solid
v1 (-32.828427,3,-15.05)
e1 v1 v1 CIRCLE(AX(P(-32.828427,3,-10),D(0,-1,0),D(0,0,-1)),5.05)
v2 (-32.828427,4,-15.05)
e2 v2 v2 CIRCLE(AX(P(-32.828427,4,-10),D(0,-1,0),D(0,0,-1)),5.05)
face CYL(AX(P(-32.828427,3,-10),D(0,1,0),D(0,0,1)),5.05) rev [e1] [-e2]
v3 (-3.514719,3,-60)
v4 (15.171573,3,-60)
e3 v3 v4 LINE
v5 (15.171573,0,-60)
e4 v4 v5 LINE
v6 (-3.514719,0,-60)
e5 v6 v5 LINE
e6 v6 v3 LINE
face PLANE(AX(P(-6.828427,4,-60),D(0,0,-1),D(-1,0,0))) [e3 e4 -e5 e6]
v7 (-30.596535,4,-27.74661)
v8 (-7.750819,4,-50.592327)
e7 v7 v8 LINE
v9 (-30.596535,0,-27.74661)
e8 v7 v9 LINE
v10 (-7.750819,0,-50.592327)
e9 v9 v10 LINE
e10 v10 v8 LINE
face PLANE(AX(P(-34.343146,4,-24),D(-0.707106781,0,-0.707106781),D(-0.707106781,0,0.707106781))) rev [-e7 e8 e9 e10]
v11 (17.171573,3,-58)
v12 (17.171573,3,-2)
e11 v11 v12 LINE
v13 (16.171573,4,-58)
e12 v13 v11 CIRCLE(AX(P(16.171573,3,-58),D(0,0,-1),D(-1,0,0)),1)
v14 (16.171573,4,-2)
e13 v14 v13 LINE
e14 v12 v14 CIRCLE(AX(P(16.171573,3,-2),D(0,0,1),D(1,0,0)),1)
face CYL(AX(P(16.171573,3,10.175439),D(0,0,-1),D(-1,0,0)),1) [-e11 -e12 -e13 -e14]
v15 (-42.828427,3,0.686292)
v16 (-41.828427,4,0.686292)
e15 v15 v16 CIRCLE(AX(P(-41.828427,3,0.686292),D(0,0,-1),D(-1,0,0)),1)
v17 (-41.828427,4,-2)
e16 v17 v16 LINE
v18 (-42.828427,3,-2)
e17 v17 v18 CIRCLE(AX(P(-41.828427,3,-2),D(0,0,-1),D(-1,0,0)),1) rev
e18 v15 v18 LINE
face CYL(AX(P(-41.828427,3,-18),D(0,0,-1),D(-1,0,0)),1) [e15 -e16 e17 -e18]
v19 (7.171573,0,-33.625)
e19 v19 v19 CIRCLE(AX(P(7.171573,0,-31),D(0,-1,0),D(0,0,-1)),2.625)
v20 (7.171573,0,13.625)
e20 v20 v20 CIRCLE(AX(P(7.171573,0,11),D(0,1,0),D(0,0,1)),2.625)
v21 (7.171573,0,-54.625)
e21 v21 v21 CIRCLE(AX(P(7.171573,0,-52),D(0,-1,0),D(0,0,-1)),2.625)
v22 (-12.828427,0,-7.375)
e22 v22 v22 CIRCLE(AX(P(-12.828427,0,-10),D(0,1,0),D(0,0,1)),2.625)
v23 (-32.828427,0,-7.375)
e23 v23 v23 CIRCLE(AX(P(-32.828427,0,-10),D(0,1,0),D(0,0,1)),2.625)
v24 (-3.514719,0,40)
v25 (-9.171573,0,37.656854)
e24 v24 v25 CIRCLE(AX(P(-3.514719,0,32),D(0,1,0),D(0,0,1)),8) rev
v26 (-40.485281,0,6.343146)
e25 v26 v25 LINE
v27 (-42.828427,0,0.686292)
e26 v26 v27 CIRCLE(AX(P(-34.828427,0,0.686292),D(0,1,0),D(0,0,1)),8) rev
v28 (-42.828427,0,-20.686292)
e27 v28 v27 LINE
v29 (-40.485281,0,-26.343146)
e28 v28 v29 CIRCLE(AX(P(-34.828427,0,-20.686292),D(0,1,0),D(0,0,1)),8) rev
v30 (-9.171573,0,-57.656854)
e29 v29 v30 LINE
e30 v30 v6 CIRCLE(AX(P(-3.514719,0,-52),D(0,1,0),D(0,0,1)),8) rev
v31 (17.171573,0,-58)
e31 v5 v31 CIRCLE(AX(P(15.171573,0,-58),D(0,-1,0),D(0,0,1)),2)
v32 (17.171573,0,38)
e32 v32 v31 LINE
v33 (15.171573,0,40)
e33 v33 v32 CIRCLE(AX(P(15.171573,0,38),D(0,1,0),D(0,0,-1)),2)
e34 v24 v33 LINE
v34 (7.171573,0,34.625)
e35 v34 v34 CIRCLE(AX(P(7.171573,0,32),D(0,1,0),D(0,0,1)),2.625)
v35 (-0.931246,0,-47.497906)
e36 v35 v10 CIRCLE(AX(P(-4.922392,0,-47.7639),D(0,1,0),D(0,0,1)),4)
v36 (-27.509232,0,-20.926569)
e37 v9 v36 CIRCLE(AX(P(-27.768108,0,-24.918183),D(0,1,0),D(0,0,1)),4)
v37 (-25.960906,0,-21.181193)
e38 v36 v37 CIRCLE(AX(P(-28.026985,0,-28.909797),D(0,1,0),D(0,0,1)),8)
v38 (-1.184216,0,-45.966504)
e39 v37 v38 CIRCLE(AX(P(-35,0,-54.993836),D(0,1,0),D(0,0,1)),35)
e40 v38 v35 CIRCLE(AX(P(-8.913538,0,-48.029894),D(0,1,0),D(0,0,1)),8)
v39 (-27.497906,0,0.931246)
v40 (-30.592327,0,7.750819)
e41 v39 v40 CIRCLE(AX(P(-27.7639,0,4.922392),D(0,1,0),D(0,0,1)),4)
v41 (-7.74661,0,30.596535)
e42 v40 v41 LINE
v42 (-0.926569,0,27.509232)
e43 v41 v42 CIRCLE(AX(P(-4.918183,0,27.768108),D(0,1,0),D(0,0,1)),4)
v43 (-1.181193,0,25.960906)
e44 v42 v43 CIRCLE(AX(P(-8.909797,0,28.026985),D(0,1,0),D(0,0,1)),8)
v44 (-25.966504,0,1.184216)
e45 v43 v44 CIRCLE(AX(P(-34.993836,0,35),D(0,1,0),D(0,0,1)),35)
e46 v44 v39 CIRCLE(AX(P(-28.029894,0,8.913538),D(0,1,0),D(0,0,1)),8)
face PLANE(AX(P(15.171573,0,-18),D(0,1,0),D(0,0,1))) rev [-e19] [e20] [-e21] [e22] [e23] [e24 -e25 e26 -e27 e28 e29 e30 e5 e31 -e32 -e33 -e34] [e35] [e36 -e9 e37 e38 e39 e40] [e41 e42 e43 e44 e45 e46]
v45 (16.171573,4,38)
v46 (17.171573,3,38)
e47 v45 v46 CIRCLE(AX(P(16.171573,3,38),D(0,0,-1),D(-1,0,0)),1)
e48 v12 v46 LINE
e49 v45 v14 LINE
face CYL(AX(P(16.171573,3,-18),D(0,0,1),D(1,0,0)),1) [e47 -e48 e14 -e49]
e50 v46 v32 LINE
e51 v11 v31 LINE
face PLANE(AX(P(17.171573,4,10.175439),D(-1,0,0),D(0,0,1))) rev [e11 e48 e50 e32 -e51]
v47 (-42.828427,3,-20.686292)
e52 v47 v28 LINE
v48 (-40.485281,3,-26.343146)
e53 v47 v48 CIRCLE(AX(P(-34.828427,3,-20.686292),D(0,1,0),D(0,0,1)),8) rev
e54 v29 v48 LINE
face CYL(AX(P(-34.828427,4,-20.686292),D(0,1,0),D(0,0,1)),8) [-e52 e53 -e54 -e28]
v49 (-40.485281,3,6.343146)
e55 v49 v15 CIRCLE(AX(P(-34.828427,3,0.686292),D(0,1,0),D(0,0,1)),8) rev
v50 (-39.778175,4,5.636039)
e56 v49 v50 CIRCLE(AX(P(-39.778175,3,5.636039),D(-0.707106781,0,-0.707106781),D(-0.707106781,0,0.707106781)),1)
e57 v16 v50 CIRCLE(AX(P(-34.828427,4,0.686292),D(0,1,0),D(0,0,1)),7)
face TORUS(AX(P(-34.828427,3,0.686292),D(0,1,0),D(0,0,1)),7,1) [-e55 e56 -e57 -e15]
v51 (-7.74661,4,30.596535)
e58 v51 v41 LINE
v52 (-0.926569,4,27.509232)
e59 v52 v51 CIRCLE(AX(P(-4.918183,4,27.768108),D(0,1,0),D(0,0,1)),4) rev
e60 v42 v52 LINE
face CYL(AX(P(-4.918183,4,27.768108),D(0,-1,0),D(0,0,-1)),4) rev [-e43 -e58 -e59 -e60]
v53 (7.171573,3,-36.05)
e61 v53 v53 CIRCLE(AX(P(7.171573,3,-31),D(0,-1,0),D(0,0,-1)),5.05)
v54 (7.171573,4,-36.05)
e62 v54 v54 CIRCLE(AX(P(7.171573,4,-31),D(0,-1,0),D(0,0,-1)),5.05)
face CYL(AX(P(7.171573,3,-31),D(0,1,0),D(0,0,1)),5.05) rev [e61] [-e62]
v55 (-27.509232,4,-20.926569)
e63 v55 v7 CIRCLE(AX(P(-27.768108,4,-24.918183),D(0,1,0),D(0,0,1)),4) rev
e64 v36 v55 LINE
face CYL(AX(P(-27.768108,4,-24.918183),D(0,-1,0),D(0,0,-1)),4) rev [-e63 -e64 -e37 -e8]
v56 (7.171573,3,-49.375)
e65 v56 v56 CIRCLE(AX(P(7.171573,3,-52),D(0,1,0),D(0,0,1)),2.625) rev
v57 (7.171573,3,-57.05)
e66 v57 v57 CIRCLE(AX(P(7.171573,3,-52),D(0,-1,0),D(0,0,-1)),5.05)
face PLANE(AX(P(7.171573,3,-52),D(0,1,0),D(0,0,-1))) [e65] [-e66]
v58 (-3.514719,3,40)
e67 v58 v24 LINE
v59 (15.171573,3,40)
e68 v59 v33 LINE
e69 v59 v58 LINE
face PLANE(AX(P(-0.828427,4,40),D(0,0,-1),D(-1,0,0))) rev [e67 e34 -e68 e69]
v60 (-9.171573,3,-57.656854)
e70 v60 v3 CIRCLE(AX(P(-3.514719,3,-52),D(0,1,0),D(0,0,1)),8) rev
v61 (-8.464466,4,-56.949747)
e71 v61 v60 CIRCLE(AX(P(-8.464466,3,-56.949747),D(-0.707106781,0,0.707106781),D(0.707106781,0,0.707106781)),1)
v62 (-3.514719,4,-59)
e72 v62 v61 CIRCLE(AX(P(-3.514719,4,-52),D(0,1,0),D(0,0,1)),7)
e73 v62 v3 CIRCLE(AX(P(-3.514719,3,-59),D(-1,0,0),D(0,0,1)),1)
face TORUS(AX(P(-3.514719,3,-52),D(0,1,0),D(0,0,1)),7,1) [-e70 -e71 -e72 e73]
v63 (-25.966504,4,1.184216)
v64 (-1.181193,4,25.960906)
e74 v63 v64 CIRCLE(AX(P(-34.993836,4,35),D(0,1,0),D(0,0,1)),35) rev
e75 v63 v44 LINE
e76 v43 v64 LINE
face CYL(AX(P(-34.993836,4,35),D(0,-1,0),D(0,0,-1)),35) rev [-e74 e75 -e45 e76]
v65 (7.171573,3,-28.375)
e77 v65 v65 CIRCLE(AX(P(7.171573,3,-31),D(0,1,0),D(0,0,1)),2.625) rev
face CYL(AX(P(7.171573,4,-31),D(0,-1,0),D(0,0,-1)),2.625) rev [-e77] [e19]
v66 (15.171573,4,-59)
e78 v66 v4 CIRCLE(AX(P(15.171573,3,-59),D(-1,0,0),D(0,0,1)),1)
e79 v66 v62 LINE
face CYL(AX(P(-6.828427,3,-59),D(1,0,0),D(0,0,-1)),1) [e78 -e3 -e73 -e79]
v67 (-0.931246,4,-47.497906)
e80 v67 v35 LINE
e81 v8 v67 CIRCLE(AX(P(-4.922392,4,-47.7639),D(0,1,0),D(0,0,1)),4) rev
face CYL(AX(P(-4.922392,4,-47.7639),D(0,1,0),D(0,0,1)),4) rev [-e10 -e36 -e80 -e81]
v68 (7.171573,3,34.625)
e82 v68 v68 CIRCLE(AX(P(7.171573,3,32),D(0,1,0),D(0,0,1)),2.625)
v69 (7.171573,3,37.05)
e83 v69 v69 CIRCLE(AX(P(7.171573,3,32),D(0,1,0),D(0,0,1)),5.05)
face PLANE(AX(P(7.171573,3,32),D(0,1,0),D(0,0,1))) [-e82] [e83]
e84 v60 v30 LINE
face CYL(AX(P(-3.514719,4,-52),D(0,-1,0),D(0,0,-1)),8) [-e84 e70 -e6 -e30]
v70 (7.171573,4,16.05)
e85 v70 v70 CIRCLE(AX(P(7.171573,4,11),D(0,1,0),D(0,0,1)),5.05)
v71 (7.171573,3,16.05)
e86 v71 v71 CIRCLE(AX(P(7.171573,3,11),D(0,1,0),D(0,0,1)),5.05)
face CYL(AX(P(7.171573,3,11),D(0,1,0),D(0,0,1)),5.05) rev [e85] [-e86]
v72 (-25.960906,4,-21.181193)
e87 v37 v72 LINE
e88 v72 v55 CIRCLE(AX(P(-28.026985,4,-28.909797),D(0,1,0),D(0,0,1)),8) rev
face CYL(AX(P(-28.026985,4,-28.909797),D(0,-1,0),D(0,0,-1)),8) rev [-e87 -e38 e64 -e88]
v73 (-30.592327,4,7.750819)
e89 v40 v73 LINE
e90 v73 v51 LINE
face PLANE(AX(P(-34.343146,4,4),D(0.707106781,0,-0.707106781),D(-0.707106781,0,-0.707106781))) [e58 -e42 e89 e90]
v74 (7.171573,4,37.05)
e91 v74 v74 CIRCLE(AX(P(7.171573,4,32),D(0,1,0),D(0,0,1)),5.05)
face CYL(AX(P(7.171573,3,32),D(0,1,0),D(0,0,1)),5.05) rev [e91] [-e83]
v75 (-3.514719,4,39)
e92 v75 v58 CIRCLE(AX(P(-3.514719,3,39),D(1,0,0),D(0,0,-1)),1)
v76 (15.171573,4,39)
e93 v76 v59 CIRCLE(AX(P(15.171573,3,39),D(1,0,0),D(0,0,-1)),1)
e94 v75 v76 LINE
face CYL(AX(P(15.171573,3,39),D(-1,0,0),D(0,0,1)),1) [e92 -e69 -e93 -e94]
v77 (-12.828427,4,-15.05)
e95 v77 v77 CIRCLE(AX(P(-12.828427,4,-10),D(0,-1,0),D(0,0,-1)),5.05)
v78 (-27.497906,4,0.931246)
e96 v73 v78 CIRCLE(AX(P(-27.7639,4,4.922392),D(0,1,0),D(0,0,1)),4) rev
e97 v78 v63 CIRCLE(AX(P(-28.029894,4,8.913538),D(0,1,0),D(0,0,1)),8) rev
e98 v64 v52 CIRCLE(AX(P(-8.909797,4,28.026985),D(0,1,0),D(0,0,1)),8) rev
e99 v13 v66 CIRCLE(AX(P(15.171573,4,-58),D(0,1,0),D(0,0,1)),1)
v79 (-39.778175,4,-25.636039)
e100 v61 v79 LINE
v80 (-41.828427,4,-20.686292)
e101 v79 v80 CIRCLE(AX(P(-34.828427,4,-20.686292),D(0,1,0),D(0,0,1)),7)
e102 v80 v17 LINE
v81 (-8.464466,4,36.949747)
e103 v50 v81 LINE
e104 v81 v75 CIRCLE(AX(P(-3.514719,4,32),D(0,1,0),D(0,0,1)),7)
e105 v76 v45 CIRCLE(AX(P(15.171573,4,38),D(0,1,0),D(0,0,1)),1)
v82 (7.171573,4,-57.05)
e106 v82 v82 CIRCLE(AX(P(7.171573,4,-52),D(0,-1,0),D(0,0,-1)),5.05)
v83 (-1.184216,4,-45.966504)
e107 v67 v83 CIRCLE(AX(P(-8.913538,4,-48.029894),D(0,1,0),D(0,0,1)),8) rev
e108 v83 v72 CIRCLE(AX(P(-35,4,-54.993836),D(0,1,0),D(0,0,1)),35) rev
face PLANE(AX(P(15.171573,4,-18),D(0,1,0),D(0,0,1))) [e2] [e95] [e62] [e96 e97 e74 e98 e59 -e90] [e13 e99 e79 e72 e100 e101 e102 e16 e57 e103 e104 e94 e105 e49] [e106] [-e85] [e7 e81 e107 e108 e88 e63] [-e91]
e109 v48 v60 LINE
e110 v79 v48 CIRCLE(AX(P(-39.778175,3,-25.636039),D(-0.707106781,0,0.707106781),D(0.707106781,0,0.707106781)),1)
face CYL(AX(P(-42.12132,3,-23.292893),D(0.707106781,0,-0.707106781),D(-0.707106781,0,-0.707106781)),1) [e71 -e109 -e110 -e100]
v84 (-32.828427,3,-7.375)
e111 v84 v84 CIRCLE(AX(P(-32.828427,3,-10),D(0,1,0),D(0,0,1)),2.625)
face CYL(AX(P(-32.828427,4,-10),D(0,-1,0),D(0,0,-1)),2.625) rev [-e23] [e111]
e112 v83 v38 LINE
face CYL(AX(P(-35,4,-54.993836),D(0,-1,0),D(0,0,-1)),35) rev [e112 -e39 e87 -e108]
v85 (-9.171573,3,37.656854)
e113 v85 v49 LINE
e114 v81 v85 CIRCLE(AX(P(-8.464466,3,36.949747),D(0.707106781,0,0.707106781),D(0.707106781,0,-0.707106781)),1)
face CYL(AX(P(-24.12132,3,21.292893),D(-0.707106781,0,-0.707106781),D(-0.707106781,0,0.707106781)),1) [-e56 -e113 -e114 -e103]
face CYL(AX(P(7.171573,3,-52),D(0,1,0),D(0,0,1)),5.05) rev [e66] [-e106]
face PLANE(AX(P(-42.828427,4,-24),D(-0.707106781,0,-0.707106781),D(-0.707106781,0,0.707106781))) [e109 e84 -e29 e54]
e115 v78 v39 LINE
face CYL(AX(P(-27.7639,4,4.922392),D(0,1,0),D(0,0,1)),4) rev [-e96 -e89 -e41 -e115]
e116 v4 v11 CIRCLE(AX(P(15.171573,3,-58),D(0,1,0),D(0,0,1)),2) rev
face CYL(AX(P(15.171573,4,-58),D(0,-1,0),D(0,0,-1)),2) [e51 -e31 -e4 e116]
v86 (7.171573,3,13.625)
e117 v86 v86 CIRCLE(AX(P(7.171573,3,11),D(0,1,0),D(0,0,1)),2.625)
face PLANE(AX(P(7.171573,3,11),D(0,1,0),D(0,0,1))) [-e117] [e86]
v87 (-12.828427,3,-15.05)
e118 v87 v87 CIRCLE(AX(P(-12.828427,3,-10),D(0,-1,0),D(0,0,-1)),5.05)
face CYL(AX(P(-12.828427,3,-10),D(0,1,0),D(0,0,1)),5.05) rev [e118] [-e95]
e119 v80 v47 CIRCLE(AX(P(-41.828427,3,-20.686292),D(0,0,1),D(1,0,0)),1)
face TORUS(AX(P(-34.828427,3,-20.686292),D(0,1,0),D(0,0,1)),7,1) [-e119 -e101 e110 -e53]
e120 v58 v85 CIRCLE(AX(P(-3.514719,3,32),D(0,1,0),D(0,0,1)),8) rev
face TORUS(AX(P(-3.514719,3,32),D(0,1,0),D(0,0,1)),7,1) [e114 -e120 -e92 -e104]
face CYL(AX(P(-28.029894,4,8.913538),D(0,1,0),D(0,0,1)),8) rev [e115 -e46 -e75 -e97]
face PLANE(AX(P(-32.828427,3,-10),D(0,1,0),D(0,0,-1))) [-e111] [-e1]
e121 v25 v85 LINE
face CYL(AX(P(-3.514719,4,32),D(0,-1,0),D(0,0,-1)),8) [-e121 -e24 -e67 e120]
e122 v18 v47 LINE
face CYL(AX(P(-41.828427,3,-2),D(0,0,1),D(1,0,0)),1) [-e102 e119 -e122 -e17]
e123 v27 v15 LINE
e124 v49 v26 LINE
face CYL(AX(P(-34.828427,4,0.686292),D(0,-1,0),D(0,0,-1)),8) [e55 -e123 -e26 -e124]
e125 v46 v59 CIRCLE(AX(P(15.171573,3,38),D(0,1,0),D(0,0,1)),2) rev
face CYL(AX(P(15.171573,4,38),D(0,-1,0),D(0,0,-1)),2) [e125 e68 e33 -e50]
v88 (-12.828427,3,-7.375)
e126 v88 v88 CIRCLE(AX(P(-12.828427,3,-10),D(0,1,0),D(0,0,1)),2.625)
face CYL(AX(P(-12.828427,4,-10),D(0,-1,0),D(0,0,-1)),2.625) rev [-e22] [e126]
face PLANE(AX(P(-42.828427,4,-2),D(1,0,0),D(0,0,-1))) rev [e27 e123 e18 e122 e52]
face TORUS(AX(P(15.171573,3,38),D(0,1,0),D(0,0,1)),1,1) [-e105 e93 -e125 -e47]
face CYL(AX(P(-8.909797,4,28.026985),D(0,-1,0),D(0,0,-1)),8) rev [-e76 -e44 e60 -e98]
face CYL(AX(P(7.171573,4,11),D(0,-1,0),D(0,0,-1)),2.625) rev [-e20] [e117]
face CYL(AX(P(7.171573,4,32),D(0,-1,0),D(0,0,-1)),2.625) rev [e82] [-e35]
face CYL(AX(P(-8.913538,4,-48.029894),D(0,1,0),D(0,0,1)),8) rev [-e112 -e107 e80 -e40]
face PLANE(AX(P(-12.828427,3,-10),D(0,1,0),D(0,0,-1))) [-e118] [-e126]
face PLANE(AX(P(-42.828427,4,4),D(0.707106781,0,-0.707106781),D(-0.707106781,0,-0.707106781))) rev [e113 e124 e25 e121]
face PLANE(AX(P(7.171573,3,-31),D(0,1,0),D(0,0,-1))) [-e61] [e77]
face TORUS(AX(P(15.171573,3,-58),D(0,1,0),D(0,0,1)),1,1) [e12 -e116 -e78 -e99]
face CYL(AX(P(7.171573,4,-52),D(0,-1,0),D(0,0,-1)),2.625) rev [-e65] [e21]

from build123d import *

# Parameters (mm, degrees)
SKETCH1_R             = 2.625
BOSS_EXTRUDE1_DEPTH   = 4
FILLET1_R             = 35
FILLET2_R             = 8
SKETCH2_R             = 5.05
CUT_EXTRUDE1_DEPTH    = 1
FILLET3_R             = 1
FILLET7_R             = 4
MIRROR1_OUTLINE_R     = 5.05
MIRROR1_DEPTH         = 4
MIRROR1_2_OUTLINE_R   = 5.05
MIRROR1_2_OUTLINE_R_2 = 2.625
MIRROR1_2_DEPTH       = 3
FILLET6_R             = 1
SKETCH3_R             = 6
BOSS_EXTRUDE2_DEPTH   = 4
FILLET8_R             = 4


with BuildPart() as part:
    # Sketch1 → Boss-Extrude1 (new body)
    with BuildSketch(Plane(origin=(0, 0, 0), x_dir=(1, 0, 0), z_dir=(0, 1, 0))):
        with BuildLine():
            Line((-0.828427125, -40), (15.171572875, -40))
            ThreePointArc((15.171572875, -40), (16.585786438, -39.414213562), (17.171572875, -38))
            Line((17.171572875, -38), (17.171572875, -10.175438596))
            Line((17.171572875, -10.175438596), (17.171572875, 18))
            ThreePointArc((17.171572875, 18), (16.585786438, 19.414213562), (15.171572875, 20))
            Line((15.171572875, 20), (-40.828427125, 20))
            ThreePointArc((-40.828427125, 20), (-42.242640687, 19.414213562), (-42.828427125, 18))
            Line((-42.828427125, 18), (-42.828427125, 2))
            Line((-42.828427125, 2), (-42.828427125, -4))
            Line((-42.828427125, -4), (-6.828427125, -40))
            Line((-6.828427125, -40), (-0.828427125, -40))
        make_face()
        with Locations(Location((-32.828427125, 10, 0), (0, 0, 270))):
            Circle(SKETCH1_R, mode=Mode.SUBTRACT)
        with Locations(Location((-12.828427125, 10, 0), (0, 0, 270))):
            Circle(SKETCH1_R, mode=Mode.SUBTRACT)
        with Locations(Location((7.171572875, -32, 0), (0, 0, 270))):
            Circle(SKETCH1_R, mode=Mode.SUBTRACT)
        with Locations(Location((7.171572875, 10, 0), (0, 0, 270))):
            Circle(SKETCH1_R, mode=Mode.SUBTRACT)
        with Locations(Location((7.171572875, -11, 0), (0, 0, 270))):
            Circle(SKETCH1_R, mode=Mode.SUBTRACT)
        Polygon((0, 0), (0, -34.343145751), (-4, -34.343145751), (-34.343145751, -4), (-34.343145751, 0), align=None, mode=Mode.SUBTRACT)
    extrude(amount=BOSS_EXTRUDE1_DEPTH)

    # Fillet1
    # the kernel refuses this fillet: 35 mm, written as the material it adds along each edge
    with BuildSketch(Plane(origin=(0, 0, 0), x_dir=(-1, 0, 0), z_dir=(0, 1, 0))) as fillet1_piece_1:
        with BuildLine():
            CenterArc((34.993835779, 35), FILLET1_R, 181.075348167, 88.924651833)
            Line((0, 34.343145751), (-0.699876716, 34.330008666))
            ThreePointArc((-0.699876716, 34.330008666), (-0.7, 17.171572875), (-0.7, 0))
            Line((-0.7, 0), (0, -0.7))
            Line((0, -0.7), (34.993835779, -0.7))
            Line((34.993835779, -0.7), (34.993835779, 0))
        make_face()
    extrude(amount=4)

    # Fillet2
    # the kernel refuses this fillet: 8 mm, written as the material it adds along each edge
    with BuildSketch(Plane(origin=(0, 0, 34.343145751), x_dir=(-0.13953759415061998, 0, -0.9902167741553647), z_dir=(0, 1, 0))) as fillet2_piece_1:
        with BuildLine():
            CenterArc((7.497620247, 7.941288924), FILLET2_R, 209.838221464, 67.107520075)
            Line((0.558150377, 3.960867097), (0, 0))
            ThreePointArc((0, 0), (4.232527559, -0.256860958), (8.465055117, 0))
        make_face()
    extrude(amount=4)
    with BuildSketch(Plane(origin=(-34.343145751, 4, 0.006049059), x_dir=(0.9902532983948017, 0, 0.13927815700322774), z_dir=(0, -1, 0))) as fillet2_piece_2:
        with BuildLine():
            CenterArc((7.49233694, 7.941371943), FILLET2_R, 209.887169965, 67.053653065)
            Line((0.556270126, 3.955023093), (0, 0))
            ThreePointArc((0, 0), (4.229545047, -0.256497749), (8.459090094, 0))
        make_face()
    extrude(amount=4)
    # the kernel refuses this fillet: 8 mm, written as the material it takes off along each edge
    with BuildSketch(Plane(origin=(-42.828427125, -8.284271247, 4), x_dir=(0.7071067811865472, 0, 0.7071067811865477), z_dir=(0, 1, 0)), Plane(origin=(-6.828427125, -8.284271247, 40), x_dir=(1, 0, 0), z_dir=(0, 1, 0))) as fillet2_2_piece_1:
        with BuildLine():
            CenterArc((FILLET2_R * 0.414213562373, FILLET2_R), FILLET2_R, 225, 45)
            Line((-FILLET2_R * 0.292893218813, FILLET2_R * 0.292893218813), (0, 0))
            Line((0, 0), (FILLET2_R * 0.414213562373, 0))
        make_face()
    extrude(amount=20.568542495, mode=Mode.SUBTRACT)

    # Sketch2 → Cut-Extrude1 (cut)
    with BuildSketch(Plane(origin=(0, 4, 0), x_dir=(1, 0, 0), z_dir=(0, 1, 0))):
        with Locations(Location((-32.828427125, 10, 0), (0, 0, 270))):
            Circle(SKETCH2_R)
        with Locations(Location((-12.828427125, 10, 0), (0, 0, 270))):
            Circle(SKETCH2_R)
        with Locations(Location((7.171572875, 10, 0), (0, 0, 270))):
            Circle(SKETCH2_R)
        with Locations(Location((7.171572875, -11, 0), (0, 0, 270))):
            Circle(SKETCH2_R)
        with Locations(Location((7.171572875, -32, 0), (0, 0, 270))):
            Circle(SKETCH2_R)
    extrude(amount=-CUT_EXTRUDE1_DEPTH, mode=Mode.SUBTRACT)

    # Fillet3
    fillet3_edges = [part.edges().sort_by_distance(p)[0] for p in [
        (-12.828427125, 4, -20),
        (-42.242640687, 4, -19.414213562),
        (-42.828427125, 4, -8.656854249),
        (16.585786438, 4, 39.414213562),
        (17.171572875, 4, 10),
        (-24.828427125, 4, 22),
        (5.828427125, 4, 40),
        (-6.576186085, 4, 39.39103626),
        (-42.219463385, 4, 3.74775896),
        (16.585786438, 4, -19.414213562),
    ]]
    fillet(fillet3_edges, radius=FILLET3_R)

    # Fillet7
    fillet7_edges = [part.edges().sort_by_distance(p)[0] for p in [
        (-34.343145751, 2, 4),
        (-4, 2, 34.343145751),
    ]]
    fillet(fillet7_edges, radius=FILLET7_R)

    # Mirror1: read off the stored shape, not the designer's step
    # Mirror1 outline → Mirror1 (add)
    with BuildSketch(Plane(origin=(0, 0, 0), x_dir=(1, 0, 0), z_dir=(0, 1, 0))):
        with BuildLine():
            ThreePointArc((-3.514718626, 60), (-6.576186085, 59.39103626), (-9.171572875, 57.656854249))
            Line((-9.171572875, 57.656854249), (-40.485281374, 26.343145751))
            ThreePointArc((-40.485281374, 26.343145751), (-42.219463385, 23.74775896), (-42.828427125, 20.686291501))
            Line((-42.828427125, 20.686291501), (-42.828427125, 2))
            ThreePointArc((-42.828427125, 2), (-42.560477932, 1), (-41.828427125, 0.267949192))
            Line((-41.828427125, 0.267949192), (-41.828427125, -0.686291501))
            ThreePointArc((-41.828427125, -0.686291501), (-41.295583852, -3.365075528), (-39.778174593, -5.636038969))
            Line((-39.778174593, -5.636038969), (-8.464466094, -36.949747468))
            ThreePointArc((-8.464466094, -36.949747468), (-6.193502652, -38.467156728), (-3.514718626, -39))
            Line((-3.514718626, -39), (15.171572875, -39))
            ThreePointArc((15.171572875, -39), (15.878679656, -38.707106781), (16.171572875, -38))
            Line((16.171572875, -38), (16.171572875, 0.267949192))
            ThreePointArc((16.171572875, 0.267949192), (16.903623683, 1), (17.171572875, 2))
            Line((17.171572875, 2), (17.171572875, 58))
            ThreePointArc((17.171572875, 58), (16.585786438, 59.414213562), (15.171572875, 60))
            Line((15.171572875, 60), (-3.514718626, 60))
        make_face()
        with BuildLine():
            ThreePointArc((-0.926569244, -27.509231599), (-3.268603973, -31.412129037), (-7.746610443, -30.596535308))
            Line((-7.746610443, -30.596535308), (-30.592327017, -7.750818734))
            ThreePointArc((-30.592327017, -7.750818734), (-31.406448507, -3.269563854), (-27.497905753, -0.931245518))
            ThreePointArc((-27.497905753, -0.931245518), (-26.72605518, -1.020502526), (-25.966503884, -1.184215537))
            ThreePointArc((-25.966503884, -1.184215537), (-10.249403108, -10.246958736), (-1.181193425, -25.960906179))
            ThreePointArc((-1.181193425, -25.960906179), (-1.015828492, -26.728811048), (-0.926569244, -27.509231599))
        make_face(mode=Mode.SUBTRACT)
        with Locations((-32.828427125, 10)):
            Circle(MIRROR1_OUTLINE_R, mode=Mode.SUBTRACT)
        with Locations((7.171572875, -32)):
            Circle(MIRROR1_OUTLINE_R, mode=Mode.SUBTRACT)
        with Locations((-12.828427125, 10)):
            Circle(MIRROR1_OUTLINE_R, mode=Mode.SUBTRACT)
        with Locations((7.171572875, -11)):
            Circle(MIRROR1_OUTLINE_R, mode=Mode.SUBTRACT)
        with Locations((7.171572875, 10)):
            Circle(MIRROR1_OUTLINE_R, mode=Mode.SUBTRACT)
        with BuildLine():
            ThreePointArc((-25.960906179, 21.181193425), (-30.576929417, 21.327068181), (-34.343145751, 24))
            Line((-34.343145751, 24), (-4, 54.343145751))
            ThreePointArc((-4, 54.343145751), (-1.330496844, 50.57891176), (-1.184215537, 45.966503884))
            ThreePointArc((-1.184215537, 45.966503884), (-10.246958736, 30.249403108), (-25.960906179, 21.181193425))
        make_face(mode=Mode.SUBTRACT)
        with Locations((7.171572875, 31)):
            Circle(MIRROR1_OUTLINE_R, mode=Mode.SUBTRACT)
        with Locations((7.171572875, 52)):
            Circle(MIRROR1_OUTLINE_R, mode=Mode.SUBTRACT)
    extrude(amount=MIRROR1_DEPTH)

    # Mirror1 2 outline → Mirror1 2 (add)
    # profile 1 of 2: a face of its own
    with BuildSketch(Plane(origin=(0, 0, 0), x_dir=(1, 0, 0), z_dir=(0, 1, 0))):
        with Locations((7.171572875, 31)):
            Circle(MIRROR1_2_OUTLINE_R)
        with Locations((7.171572875, 31)):
            Circle(MIRROR1_2_OUTLINE_R_2, mode=Mode.SUBTRACT)
    # profile 2 of 2: a face of its own
    with BuildSketch(Plane(origin=(0, 0, 0), x_dir=(1, 0, 0), z_dir=(0, 1, 0))):
        with Locations((7.171572875, 52)):
            Circle(MIRROR1_2_OUTLINE_R)
        with Locations((7.171572875, 52)):
            Circle(MIRROR1_2_OUTLINE_R_2, mode=Mode.SUBTRACT)
    extrude(amount=MIRROR1_2_DEPTH)

    # Fillet6
    fillet6_edges = [part.edges().sort_by_distance(p)[0] for p in [
        (-42.828427125, 4, -11.34314575),
        (-42.219463385, 4, -23.74775896),
        (-24.828427125, 4, -42),
        (-6.576186085, 4, -59.39103626),
        (5.828427125, 4, -60),
        (16.585786438, 4, -59.414213563),
        (17.171572875, 4, -30),
    ]]
    fillet(fillet6_edges, radius=FILLET6_R - 0.0001)  # a hair under: the kernel refuses the full size

    # Sketch3 → Boss-Extrude2 (add)
    with BuildSketch(Plane(origin=(0, 4, 0), x_dir=(1, 0, 0), z_dir=(0, 1, 0))):
        with Locations((7.171572875, 10)):
            Circle(SKETCH3_R)
    extrude(amount=-BOSS_EXTRUDE2_DEPTH)

    # Fillet8
    fillet8_edges = [part.edges().sort_by_distance(p)[0] for p in [
        (-4, 2, -54.343145751),
        (-34.343145751, 2, -24),
    ]]
    fillet(fillet8_edges, radius=FILLET8_R)


solid = part.part
